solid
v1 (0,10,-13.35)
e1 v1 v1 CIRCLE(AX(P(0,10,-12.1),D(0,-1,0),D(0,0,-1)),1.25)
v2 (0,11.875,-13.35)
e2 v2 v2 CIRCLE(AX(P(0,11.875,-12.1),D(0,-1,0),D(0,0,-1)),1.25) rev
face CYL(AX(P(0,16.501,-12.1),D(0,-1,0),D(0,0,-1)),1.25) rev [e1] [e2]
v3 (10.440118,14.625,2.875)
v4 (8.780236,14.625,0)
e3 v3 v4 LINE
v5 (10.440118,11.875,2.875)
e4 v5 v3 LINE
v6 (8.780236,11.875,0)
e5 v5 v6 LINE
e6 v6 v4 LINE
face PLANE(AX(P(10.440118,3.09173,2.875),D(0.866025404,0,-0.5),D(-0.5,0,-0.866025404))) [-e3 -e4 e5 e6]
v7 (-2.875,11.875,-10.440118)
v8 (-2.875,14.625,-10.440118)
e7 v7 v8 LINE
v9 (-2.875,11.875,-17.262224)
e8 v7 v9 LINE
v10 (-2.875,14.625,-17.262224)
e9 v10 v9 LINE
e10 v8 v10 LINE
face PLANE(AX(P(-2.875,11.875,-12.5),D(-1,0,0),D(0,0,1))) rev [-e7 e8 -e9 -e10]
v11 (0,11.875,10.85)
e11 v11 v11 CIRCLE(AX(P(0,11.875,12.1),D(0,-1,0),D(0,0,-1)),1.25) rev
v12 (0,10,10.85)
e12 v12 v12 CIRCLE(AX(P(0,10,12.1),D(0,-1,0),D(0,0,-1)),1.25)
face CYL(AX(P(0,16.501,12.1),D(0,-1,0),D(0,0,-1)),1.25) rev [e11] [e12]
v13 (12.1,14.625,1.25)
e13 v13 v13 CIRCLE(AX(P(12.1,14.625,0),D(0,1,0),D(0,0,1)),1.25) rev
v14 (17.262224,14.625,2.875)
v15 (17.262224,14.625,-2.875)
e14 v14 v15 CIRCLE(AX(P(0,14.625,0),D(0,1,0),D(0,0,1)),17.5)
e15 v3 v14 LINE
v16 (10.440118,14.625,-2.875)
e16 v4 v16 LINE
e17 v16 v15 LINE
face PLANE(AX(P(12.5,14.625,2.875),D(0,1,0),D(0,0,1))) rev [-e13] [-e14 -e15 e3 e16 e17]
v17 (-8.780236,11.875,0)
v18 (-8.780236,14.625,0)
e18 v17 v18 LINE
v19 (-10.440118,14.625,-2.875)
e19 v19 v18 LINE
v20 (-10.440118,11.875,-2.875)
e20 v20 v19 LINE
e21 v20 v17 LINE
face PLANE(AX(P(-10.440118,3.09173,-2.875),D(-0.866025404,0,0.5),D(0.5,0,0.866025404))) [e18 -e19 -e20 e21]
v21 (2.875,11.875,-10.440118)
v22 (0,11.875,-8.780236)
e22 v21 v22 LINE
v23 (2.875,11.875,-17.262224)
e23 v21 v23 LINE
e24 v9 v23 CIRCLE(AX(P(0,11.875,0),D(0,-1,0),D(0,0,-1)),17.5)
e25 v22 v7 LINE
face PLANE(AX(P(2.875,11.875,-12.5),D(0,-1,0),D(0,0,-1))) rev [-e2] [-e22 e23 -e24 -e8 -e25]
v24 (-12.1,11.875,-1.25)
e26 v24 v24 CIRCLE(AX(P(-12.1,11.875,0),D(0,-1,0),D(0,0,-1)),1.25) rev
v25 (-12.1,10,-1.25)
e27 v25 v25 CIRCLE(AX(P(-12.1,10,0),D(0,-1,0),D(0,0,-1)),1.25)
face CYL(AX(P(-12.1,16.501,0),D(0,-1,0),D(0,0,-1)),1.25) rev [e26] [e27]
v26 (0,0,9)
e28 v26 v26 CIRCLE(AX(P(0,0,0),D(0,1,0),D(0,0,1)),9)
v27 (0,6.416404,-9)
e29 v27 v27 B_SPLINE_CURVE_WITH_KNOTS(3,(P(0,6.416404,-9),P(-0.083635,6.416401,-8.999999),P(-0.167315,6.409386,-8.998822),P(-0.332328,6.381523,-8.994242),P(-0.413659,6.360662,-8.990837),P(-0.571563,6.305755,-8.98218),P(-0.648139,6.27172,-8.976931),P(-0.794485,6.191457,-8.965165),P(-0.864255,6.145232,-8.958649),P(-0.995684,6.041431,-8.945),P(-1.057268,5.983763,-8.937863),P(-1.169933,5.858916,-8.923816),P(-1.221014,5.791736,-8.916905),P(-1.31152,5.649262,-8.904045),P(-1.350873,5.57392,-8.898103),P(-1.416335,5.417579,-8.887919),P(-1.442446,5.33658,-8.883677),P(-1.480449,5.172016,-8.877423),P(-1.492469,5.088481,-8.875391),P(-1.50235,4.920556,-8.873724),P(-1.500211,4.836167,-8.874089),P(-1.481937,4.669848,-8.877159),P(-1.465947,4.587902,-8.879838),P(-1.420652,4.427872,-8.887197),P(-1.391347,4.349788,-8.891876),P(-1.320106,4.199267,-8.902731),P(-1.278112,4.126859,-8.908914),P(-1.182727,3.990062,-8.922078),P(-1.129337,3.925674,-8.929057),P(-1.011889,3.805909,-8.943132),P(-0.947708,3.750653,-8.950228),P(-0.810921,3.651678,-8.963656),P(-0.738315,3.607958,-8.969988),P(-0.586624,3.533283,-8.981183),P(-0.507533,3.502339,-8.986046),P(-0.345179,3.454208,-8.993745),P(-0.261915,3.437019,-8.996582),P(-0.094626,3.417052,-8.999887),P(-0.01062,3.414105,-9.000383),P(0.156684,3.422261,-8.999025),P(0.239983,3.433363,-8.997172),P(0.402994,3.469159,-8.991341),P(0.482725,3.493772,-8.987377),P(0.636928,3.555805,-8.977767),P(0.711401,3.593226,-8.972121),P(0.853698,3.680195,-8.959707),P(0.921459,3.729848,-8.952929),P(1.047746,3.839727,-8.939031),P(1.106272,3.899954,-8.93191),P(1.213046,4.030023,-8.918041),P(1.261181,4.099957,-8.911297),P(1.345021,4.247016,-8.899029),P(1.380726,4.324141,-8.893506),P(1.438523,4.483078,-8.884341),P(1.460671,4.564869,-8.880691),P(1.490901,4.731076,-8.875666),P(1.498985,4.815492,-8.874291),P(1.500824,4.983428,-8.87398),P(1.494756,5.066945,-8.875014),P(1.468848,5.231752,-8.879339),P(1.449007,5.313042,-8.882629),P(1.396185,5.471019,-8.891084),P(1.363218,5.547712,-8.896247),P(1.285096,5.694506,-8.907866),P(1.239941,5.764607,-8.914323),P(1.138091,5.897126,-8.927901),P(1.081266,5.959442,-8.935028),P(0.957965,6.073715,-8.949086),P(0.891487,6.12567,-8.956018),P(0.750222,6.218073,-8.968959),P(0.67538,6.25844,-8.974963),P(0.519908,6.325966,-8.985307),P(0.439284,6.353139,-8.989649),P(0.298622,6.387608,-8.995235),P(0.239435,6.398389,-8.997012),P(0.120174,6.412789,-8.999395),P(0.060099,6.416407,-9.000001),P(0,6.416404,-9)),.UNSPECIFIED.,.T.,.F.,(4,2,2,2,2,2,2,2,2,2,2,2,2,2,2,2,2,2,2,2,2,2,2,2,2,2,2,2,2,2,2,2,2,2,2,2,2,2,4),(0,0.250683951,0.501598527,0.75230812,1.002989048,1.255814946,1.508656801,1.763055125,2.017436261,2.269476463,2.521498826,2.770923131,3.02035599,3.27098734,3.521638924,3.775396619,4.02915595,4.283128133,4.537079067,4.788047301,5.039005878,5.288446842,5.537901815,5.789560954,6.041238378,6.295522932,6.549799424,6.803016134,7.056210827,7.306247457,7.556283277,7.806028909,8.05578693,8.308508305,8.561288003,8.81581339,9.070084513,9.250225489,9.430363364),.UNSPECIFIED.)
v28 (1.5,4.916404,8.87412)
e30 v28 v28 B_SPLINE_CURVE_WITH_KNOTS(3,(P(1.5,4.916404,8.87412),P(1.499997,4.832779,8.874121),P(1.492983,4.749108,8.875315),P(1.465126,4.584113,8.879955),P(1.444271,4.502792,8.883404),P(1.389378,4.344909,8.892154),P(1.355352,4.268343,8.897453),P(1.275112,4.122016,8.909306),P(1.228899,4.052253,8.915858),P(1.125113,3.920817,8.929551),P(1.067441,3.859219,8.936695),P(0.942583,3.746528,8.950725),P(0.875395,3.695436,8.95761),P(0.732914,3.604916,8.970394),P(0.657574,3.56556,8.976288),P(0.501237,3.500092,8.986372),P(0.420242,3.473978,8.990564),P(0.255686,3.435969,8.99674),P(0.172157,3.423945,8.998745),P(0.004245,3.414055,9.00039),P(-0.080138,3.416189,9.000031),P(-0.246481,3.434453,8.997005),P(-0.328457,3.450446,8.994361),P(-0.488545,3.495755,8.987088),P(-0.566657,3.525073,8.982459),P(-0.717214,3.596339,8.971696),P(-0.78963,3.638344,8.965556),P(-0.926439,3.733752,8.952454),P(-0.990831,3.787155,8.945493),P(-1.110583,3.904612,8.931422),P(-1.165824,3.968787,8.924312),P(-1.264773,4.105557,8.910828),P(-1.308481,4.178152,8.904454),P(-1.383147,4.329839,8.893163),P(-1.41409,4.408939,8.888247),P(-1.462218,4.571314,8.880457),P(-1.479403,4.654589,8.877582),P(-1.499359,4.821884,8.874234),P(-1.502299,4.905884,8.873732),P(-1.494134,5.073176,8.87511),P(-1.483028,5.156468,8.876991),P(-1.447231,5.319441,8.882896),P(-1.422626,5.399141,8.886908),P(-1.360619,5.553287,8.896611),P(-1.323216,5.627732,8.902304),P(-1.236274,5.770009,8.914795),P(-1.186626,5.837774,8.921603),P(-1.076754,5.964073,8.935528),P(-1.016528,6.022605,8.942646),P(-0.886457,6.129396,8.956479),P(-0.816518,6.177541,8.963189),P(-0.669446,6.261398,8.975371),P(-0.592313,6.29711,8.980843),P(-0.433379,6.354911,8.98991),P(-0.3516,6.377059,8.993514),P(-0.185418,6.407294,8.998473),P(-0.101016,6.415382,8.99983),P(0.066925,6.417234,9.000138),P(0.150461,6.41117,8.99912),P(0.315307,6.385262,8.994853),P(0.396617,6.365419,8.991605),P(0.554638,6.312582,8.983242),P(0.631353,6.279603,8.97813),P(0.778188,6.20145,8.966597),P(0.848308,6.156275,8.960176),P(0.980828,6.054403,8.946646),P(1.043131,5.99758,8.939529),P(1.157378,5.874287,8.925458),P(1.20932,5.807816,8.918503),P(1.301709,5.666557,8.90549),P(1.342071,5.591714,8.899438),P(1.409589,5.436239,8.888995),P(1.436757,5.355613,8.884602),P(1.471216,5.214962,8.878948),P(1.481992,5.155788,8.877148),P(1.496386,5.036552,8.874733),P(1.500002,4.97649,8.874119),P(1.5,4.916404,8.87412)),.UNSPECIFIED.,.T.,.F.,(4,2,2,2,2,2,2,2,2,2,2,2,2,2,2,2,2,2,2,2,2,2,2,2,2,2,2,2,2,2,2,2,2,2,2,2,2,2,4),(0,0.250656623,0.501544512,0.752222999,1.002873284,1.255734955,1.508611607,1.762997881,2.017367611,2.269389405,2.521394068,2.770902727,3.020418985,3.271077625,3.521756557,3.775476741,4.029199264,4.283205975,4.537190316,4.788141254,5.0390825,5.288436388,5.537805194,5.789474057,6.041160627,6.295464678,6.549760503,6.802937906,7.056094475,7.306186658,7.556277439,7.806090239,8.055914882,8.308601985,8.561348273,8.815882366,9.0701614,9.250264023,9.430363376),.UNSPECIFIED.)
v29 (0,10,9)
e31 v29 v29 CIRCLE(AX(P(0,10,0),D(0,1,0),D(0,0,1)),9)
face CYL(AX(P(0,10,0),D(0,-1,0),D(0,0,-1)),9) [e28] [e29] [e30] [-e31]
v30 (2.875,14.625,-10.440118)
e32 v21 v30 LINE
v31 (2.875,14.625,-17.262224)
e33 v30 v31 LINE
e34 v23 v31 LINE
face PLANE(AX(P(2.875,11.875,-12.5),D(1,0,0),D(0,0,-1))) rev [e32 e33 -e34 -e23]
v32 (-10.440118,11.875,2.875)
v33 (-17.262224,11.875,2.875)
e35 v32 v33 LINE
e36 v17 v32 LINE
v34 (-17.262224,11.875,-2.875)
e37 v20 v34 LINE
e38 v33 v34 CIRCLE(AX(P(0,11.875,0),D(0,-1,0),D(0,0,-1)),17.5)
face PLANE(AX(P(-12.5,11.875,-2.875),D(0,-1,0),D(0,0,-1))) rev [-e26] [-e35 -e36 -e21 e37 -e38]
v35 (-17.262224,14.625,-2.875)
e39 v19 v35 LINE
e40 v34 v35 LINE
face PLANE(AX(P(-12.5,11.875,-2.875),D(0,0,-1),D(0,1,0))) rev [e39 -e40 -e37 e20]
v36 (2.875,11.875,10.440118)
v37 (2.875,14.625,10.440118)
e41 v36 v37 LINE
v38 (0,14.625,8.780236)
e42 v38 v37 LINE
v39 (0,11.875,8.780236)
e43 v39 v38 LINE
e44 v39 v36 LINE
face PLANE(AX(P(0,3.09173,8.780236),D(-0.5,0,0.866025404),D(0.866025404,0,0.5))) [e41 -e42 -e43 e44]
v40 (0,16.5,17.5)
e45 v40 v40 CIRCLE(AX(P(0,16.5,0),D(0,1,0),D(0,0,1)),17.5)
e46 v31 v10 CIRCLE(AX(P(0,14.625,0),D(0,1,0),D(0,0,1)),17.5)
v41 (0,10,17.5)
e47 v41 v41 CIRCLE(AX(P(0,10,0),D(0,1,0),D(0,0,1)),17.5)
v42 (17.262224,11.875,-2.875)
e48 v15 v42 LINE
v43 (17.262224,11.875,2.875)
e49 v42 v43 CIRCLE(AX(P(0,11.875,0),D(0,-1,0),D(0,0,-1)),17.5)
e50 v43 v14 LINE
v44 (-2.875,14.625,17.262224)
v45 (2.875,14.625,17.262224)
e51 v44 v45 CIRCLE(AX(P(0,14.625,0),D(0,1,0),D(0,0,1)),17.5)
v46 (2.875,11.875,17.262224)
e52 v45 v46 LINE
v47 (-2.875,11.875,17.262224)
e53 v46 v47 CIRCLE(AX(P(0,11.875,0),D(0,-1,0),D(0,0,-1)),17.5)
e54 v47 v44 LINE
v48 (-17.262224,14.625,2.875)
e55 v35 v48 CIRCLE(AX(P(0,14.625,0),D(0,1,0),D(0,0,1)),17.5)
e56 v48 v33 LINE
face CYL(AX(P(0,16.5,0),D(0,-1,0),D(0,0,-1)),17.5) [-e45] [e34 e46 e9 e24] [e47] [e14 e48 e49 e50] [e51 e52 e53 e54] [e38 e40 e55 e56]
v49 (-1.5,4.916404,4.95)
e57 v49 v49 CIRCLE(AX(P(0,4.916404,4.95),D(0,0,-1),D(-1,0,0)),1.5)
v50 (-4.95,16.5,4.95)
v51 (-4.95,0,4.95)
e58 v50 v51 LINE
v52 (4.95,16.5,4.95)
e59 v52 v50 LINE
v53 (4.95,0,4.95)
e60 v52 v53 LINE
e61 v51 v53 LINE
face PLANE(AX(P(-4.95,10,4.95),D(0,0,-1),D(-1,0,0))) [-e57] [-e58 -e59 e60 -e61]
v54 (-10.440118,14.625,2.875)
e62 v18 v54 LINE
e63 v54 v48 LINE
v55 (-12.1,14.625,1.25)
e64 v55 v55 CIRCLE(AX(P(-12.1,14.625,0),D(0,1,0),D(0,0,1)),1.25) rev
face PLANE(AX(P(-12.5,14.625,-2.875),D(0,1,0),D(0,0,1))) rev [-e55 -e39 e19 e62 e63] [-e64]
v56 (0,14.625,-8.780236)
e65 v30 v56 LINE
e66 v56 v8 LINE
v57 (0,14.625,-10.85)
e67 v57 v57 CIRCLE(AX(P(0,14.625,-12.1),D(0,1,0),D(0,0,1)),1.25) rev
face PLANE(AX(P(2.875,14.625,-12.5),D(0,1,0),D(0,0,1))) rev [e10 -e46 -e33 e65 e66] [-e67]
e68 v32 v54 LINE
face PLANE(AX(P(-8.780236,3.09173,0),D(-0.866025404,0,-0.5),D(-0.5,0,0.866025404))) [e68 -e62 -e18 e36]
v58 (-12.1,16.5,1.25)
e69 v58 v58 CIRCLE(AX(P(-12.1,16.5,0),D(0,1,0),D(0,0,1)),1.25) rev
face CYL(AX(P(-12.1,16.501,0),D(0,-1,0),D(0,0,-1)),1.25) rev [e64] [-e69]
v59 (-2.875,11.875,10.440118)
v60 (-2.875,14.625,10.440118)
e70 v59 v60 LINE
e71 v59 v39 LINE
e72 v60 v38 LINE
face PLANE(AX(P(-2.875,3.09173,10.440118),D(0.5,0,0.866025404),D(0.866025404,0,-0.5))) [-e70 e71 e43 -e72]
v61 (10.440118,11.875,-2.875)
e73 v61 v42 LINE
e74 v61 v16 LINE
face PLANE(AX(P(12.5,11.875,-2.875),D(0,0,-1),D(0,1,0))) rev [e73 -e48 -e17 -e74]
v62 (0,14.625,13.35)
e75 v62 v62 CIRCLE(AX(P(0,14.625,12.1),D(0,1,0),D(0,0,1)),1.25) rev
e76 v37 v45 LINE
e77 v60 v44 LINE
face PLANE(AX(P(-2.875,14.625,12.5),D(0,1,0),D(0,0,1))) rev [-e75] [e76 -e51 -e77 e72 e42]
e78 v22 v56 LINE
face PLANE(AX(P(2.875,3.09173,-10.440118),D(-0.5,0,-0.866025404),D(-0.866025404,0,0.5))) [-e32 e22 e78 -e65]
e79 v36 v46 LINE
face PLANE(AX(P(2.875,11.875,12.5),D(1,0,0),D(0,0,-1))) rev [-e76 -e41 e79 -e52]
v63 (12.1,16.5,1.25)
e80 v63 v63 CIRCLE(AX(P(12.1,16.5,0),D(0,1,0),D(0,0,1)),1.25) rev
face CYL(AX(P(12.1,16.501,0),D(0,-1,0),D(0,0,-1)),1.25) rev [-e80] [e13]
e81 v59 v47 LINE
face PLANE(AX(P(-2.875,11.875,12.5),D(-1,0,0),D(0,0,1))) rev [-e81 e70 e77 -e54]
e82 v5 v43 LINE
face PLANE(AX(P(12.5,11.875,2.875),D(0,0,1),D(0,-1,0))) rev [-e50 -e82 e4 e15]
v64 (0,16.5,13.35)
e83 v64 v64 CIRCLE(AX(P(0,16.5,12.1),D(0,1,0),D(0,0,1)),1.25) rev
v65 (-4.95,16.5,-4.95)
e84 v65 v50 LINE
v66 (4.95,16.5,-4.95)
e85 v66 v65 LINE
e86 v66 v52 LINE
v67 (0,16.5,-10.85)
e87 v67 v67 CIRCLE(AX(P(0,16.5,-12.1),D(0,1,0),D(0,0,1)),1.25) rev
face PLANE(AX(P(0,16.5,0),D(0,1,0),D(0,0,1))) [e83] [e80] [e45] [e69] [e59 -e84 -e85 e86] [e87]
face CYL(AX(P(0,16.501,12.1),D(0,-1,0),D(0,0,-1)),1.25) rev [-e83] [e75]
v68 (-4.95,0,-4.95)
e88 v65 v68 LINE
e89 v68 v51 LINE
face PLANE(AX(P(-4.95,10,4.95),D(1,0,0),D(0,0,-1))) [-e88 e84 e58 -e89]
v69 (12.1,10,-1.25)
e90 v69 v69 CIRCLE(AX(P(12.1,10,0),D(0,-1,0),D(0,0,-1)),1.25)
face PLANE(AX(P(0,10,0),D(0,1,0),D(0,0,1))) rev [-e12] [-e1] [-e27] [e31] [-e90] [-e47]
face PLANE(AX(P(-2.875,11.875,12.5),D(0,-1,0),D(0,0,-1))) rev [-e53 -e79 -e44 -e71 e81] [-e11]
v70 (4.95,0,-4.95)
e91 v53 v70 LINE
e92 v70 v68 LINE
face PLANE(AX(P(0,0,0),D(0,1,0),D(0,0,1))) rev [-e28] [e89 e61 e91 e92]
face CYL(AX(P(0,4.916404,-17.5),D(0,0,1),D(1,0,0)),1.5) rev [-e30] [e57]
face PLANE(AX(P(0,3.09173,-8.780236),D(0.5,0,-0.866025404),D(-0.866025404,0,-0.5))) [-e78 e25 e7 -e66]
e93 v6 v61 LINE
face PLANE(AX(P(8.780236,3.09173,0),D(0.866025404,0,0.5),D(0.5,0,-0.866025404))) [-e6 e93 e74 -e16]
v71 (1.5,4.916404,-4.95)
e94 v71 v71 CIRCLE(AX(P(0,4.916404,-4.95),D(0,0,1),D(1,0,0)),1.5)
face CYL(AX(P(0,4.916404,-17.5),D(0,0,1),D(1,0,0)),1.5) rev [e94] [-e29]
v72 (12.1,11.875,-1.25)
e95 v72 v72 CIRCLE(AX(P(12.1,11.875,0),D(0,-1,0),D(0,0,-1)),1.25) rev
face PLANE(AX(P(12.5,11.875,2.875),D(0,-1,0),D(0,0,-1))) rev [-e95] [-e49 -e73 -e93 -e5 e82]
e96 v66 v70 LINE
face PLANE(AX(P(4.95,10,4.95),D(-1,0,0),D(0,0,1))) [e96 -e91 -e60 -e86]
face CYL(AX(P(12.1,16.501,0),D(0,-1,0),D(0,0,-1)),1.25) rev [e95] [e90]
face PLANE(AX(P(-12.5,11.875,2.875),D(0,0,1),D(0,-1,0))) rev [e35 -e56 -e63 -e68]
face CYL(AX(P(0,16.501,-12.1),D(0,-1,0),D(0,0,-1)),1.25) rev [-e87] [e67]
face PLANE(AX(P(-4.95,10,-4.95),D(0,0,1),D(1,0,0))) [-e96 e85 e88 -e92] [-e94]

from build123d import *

# Parameters (mm, degrees)
SKETCH1_R               = 9
SKETCH1_W               = 9.9
SKETCH1_H               = 9.9
BOSS_EXTRUDE1_DEPTH     = 10
SKETCH2_R               = 17.5
BOSS_EXTRUDE2_DEPTH     = 6.5
CUT_EXTRUDE1_REACH      = 28.693
SKETCH3_R               = 1.25
CUT_EXTRUDE2_DEPTH      = 30.744747435
CUT_EXTRUDE2_DEPTH_BACK = 30.744747435
SKETCH4_R               = 1.5
CUT_EXTRUDE3_DEPTH      = 10
CUT_EXTRUDE3_DEPTH_BACK = 10
SKETCH6_W               = 9.9
SKETCH6_H               = 9.9
SKETCH8_W               = 5.75
SKETCH8_H               = 2.75
CUT_EXTRUDE4_DEPTH      = 5
CUT_EXTRUDE5_DEPTH      = 2.75
CIRPATTERN1_START       = 11.875
CIRPATTERN1_OUTLINE_R   = 1.25
CIRPATTERN1_DEPTH       = 2.75


# Read off the part's stored shape, not the designer's step: CirPattern1
with BuildPart() as part:
    # Sketch1 → Boss-Extrude1 (new body)
    with BuildSketch(Plane(origin=(0, 0, 0), x_dir=(1, 0, 0), z_dir=(0, 1, 0))):
        with Locations(Location((0, 0, 0), (0, 0, 270))):
            Circle(SKETCH1_R)
        Rectangle(SKETCH1_W, SKETCH1_H, mode=Mode.SUBTRACT)
    extrude(amount=BOSS_EXTRUDE1_DEPTH)

    # Sketch2 → Boss-Extrude2 (add)
    with BuildSketch(Plane(origin=(0, 10, 0), x_dir=(1, 0, 0), z_dir=(0, 1, 0))):
        with Locations(Location((0, 0, 0), (0, 0, 90))):
            Circle(SKETCH2_R)
    extrude(amount=BOSS_EXTRUDE2_DEPTH)

    # Sketch3 → Cut-Extrude1 (cut, up to next)
    with BuildSketch(Plane.XZ.offset(-10), mode=Mode.PRIVATE) as cut_extrude1_sk1:
        with Locations(Location((12.1, 0, 0), (0, 0, 270))):
            Circle(SKETCH3_R)
    cut_extrude1_tool1 = extrude(cut_extrude1_sk1.sketch, amount=-CUT_EXTRUDE1_REACH, mode=Mode.PRIVATE) & part.part
    # Sketch3 → Cut-Extrude1 (cut, up to next)
    with BuildSketch(Plane.XZ.offset(-10), mode=Mode.PRIVATE) as cut_extrude1_sk2:
        with Locations(Location((0, -12.1, 0), (0, 0, 270))):
            Circle(SKETCH3_R)
    cut_extrude1_tool2 = extrude(cut_extrude1_sk2.sketch, amount=-CUT_EXTRUDE1_REACH, mode=Mode.PRIVATE) & part.part
    # Sketch3 → Cut-Extrude1 (cut, up to next)
    with BuildSketch(Plane.XZ.offset(-10), mode=Mode.PRIVATE) as cut_extrude1_sk3:
        with Locations(Location((-12.1, 0, 0), (0, 0, 270))):
            Circle(SKETCH3_R)
    cut_extrude1_tool3 = extrude(cut_extrude1_sk3.sketch, amount=-CUT_EXTRUDE1_REACH, mode=Mode.PRIVATE) & part.part
    # Sketch3 → Cut-Extrude1 (cut, up to next)
    with BuildSketch(Plane.XZ.offset(-10), mode=Mode.PRIVATE) as cut_extrude1_sk4:
        with Locations(Location((0, 12.1, 0), (0, 0, 270))):
            Circle(SKETCH3_R)
    cut_extrude1_tool4 = extrude(cut_extrude1_sk4.sketch, amount=-CUT_EXTRUDE1_REACH, mode=Mode.PRIVATE) & part.part
    add(cut_extrude1_tool1.solids().sort_by_distance((12.1, 10, 0))[0], mode=Mode.SUBTRACT)
    add(cut_extrude1_tool2.solids().sort_by_distance((0, 10, -12.1))[0], mode=Mode.SUBTRACT)
    add(cut_extrude1_tool3.solids().sort_by_distance((-12.1, 10, 0))[0], mode=Mode.SUBTRACT)
    add(cut_extrude1_tool4.solids().sort_by_distance((0, 10, 12.1))[0], mode=Mode.SUBTRACT)

    # Sketch4 → Cut-Extrude2 (cut, two sides: drawn at the far end of the back side and taken through both)
    with BuildSketch(Plane.XY.offset(-CUT_EXTRUDE2_DEPTH_BACK)):
        with Locations((0, 4.916404418)):
            Circle(SKETCH4_R)
    extrude(amount=CUT_EXTRUDE2_DEPTH + CUT_EXTRUDE2_DEPTH_BACK, mode=Mode.SUBTRACT)

    # Sketch6 → Cut-Extrude3 (cut, two sides: drawn at the far end of the back side and taken through both)
    with BuildSketch(Plane(origin=(0, 10, 0), x_dir=(-1, 0, 0), z_dir=(0, -1, 0)).offset(-CUT_EXTRUDE3_DEPTH_BACK)):
        Rectangle(SKETCH6_W, SKETCH6_H)
    extrude(amount=CUT_EXTRUDE3_DEPTH + CUT_EXTRUDE3_DEPTH_BACK, mode=Mode.SUBTRACT)

    # Sketch8 → Cut-Extrude4 (cut)
    with BuildSketch(Plane(origin=(17.5, 0, 0), x_dir=(0, 0, -1), z_dir=(1, 0, 0))):
        with Locations((0, 13.25)):
            Rectangle(SKETCH8_W, SKETCH8_H)
    extrude(amount=-CUT_EXTRUDE4_DEPTH, mode=Mode.SUBTRACT)

    # Sketch9 → Cut-Extrude5 (cut)
    with BuildSketch(Plane.XZ.offset(-14.625)):
        Polygon((15.419764048, 0), (13.759882024, 2.875), (10.440117976, 2.875), (8.780235952, 0), (10.440117976, -2.875), (13.759882024, -2.875), align=None)
    extrude(amount=CUT_EXTRUDE5_DEPTH, mode=Mode.SUBTRACT)

    # CirPattern1 outline → CirPattern1 (cut)
    # profile 1 of 3: a face of its own
    with BuildSketch(Plane(origin=(0, 0, 0), x_dir=(1, 0, 0), z_dir=(0, 1, 0)).offset(CIRPATTERN1_START)):
        with BuildLine():
            Line((-8.780235952, 0), (-10.440117976, 2.875))
            Line((-10.440117976, 2.875), (-17.26222393, 2.875))
            ThreePointArc((-17.26222393, 2.875), (-17.5, 0), (-17.26222393, -2.875))
            Line((-17.26222393, -2.875), (-10.440117976, -2.875))
            Line((-10.440117976, -2.875), (-8.780235952, 0))
        make_face()
        with Locations((-12.1, 0)):
            Circle(CIRPATTERN1_OUTLINE_R, mode=Mode.SUBTRACT)
    # profile 2 of 3: a face of its own
    with BuildSketch(Plane(origin=(0, 0, 0), x_dir=(1, 0, 0), z_dir=(0, 1, 0)).offset(CIRPATTERN1_START)):
        with BuildLine():
            ThreePointArc((2.875, 17.26222393), (0, 17.5), (-2.875, 17.26222393))
            Line((-2.875, 17.26222393), (-2.875, 10.440117976))
            Line((-2.875, 10.440117976), (0, 8.780235952))
            Line((0, 8.780235952), (2.875, 10.440117976))
            Line((2.875, 10.440117976), (2.875, 17.26222393))
        make_face()
        with Locations((0, 12.1)):
            Circle(CIRPATTERN1_OUTLINE_R, mode=Mode.SUBTRACT)
    # profile 3 of 3: a face of its own
    with BuildSketch(Plane(origin=(0, 0, 0), x_dir=(1, 0, 0), z_dir=(0, 1, 0)).offset(CIRPATTERN1_START)):
        with BuildLine():
            Line((-2.875, -10.440117976), (-2.875, -17.26222393))
            ThreePointArc((-2.875, -17.26222393), (0, -17.5), (2.875, -17.26222393))
            Line((2.875, -17.26222393), (2.875, -10.440117976))
            Line((2.875, -10.440117976), (0, -8.780235952))
            Line((0, -8.780235952), (-2.875, -10.440117976))
        make_face()
        with Locations((0, -12.1)):
            Circle(CIRPATTERN1_OUTLINE_R, mode=Mode.SUBTRACT)
    extrude(amount=CIRPATTERN1_DEPTH, mode=Mode.SUBTRACT)


solid = part.part
